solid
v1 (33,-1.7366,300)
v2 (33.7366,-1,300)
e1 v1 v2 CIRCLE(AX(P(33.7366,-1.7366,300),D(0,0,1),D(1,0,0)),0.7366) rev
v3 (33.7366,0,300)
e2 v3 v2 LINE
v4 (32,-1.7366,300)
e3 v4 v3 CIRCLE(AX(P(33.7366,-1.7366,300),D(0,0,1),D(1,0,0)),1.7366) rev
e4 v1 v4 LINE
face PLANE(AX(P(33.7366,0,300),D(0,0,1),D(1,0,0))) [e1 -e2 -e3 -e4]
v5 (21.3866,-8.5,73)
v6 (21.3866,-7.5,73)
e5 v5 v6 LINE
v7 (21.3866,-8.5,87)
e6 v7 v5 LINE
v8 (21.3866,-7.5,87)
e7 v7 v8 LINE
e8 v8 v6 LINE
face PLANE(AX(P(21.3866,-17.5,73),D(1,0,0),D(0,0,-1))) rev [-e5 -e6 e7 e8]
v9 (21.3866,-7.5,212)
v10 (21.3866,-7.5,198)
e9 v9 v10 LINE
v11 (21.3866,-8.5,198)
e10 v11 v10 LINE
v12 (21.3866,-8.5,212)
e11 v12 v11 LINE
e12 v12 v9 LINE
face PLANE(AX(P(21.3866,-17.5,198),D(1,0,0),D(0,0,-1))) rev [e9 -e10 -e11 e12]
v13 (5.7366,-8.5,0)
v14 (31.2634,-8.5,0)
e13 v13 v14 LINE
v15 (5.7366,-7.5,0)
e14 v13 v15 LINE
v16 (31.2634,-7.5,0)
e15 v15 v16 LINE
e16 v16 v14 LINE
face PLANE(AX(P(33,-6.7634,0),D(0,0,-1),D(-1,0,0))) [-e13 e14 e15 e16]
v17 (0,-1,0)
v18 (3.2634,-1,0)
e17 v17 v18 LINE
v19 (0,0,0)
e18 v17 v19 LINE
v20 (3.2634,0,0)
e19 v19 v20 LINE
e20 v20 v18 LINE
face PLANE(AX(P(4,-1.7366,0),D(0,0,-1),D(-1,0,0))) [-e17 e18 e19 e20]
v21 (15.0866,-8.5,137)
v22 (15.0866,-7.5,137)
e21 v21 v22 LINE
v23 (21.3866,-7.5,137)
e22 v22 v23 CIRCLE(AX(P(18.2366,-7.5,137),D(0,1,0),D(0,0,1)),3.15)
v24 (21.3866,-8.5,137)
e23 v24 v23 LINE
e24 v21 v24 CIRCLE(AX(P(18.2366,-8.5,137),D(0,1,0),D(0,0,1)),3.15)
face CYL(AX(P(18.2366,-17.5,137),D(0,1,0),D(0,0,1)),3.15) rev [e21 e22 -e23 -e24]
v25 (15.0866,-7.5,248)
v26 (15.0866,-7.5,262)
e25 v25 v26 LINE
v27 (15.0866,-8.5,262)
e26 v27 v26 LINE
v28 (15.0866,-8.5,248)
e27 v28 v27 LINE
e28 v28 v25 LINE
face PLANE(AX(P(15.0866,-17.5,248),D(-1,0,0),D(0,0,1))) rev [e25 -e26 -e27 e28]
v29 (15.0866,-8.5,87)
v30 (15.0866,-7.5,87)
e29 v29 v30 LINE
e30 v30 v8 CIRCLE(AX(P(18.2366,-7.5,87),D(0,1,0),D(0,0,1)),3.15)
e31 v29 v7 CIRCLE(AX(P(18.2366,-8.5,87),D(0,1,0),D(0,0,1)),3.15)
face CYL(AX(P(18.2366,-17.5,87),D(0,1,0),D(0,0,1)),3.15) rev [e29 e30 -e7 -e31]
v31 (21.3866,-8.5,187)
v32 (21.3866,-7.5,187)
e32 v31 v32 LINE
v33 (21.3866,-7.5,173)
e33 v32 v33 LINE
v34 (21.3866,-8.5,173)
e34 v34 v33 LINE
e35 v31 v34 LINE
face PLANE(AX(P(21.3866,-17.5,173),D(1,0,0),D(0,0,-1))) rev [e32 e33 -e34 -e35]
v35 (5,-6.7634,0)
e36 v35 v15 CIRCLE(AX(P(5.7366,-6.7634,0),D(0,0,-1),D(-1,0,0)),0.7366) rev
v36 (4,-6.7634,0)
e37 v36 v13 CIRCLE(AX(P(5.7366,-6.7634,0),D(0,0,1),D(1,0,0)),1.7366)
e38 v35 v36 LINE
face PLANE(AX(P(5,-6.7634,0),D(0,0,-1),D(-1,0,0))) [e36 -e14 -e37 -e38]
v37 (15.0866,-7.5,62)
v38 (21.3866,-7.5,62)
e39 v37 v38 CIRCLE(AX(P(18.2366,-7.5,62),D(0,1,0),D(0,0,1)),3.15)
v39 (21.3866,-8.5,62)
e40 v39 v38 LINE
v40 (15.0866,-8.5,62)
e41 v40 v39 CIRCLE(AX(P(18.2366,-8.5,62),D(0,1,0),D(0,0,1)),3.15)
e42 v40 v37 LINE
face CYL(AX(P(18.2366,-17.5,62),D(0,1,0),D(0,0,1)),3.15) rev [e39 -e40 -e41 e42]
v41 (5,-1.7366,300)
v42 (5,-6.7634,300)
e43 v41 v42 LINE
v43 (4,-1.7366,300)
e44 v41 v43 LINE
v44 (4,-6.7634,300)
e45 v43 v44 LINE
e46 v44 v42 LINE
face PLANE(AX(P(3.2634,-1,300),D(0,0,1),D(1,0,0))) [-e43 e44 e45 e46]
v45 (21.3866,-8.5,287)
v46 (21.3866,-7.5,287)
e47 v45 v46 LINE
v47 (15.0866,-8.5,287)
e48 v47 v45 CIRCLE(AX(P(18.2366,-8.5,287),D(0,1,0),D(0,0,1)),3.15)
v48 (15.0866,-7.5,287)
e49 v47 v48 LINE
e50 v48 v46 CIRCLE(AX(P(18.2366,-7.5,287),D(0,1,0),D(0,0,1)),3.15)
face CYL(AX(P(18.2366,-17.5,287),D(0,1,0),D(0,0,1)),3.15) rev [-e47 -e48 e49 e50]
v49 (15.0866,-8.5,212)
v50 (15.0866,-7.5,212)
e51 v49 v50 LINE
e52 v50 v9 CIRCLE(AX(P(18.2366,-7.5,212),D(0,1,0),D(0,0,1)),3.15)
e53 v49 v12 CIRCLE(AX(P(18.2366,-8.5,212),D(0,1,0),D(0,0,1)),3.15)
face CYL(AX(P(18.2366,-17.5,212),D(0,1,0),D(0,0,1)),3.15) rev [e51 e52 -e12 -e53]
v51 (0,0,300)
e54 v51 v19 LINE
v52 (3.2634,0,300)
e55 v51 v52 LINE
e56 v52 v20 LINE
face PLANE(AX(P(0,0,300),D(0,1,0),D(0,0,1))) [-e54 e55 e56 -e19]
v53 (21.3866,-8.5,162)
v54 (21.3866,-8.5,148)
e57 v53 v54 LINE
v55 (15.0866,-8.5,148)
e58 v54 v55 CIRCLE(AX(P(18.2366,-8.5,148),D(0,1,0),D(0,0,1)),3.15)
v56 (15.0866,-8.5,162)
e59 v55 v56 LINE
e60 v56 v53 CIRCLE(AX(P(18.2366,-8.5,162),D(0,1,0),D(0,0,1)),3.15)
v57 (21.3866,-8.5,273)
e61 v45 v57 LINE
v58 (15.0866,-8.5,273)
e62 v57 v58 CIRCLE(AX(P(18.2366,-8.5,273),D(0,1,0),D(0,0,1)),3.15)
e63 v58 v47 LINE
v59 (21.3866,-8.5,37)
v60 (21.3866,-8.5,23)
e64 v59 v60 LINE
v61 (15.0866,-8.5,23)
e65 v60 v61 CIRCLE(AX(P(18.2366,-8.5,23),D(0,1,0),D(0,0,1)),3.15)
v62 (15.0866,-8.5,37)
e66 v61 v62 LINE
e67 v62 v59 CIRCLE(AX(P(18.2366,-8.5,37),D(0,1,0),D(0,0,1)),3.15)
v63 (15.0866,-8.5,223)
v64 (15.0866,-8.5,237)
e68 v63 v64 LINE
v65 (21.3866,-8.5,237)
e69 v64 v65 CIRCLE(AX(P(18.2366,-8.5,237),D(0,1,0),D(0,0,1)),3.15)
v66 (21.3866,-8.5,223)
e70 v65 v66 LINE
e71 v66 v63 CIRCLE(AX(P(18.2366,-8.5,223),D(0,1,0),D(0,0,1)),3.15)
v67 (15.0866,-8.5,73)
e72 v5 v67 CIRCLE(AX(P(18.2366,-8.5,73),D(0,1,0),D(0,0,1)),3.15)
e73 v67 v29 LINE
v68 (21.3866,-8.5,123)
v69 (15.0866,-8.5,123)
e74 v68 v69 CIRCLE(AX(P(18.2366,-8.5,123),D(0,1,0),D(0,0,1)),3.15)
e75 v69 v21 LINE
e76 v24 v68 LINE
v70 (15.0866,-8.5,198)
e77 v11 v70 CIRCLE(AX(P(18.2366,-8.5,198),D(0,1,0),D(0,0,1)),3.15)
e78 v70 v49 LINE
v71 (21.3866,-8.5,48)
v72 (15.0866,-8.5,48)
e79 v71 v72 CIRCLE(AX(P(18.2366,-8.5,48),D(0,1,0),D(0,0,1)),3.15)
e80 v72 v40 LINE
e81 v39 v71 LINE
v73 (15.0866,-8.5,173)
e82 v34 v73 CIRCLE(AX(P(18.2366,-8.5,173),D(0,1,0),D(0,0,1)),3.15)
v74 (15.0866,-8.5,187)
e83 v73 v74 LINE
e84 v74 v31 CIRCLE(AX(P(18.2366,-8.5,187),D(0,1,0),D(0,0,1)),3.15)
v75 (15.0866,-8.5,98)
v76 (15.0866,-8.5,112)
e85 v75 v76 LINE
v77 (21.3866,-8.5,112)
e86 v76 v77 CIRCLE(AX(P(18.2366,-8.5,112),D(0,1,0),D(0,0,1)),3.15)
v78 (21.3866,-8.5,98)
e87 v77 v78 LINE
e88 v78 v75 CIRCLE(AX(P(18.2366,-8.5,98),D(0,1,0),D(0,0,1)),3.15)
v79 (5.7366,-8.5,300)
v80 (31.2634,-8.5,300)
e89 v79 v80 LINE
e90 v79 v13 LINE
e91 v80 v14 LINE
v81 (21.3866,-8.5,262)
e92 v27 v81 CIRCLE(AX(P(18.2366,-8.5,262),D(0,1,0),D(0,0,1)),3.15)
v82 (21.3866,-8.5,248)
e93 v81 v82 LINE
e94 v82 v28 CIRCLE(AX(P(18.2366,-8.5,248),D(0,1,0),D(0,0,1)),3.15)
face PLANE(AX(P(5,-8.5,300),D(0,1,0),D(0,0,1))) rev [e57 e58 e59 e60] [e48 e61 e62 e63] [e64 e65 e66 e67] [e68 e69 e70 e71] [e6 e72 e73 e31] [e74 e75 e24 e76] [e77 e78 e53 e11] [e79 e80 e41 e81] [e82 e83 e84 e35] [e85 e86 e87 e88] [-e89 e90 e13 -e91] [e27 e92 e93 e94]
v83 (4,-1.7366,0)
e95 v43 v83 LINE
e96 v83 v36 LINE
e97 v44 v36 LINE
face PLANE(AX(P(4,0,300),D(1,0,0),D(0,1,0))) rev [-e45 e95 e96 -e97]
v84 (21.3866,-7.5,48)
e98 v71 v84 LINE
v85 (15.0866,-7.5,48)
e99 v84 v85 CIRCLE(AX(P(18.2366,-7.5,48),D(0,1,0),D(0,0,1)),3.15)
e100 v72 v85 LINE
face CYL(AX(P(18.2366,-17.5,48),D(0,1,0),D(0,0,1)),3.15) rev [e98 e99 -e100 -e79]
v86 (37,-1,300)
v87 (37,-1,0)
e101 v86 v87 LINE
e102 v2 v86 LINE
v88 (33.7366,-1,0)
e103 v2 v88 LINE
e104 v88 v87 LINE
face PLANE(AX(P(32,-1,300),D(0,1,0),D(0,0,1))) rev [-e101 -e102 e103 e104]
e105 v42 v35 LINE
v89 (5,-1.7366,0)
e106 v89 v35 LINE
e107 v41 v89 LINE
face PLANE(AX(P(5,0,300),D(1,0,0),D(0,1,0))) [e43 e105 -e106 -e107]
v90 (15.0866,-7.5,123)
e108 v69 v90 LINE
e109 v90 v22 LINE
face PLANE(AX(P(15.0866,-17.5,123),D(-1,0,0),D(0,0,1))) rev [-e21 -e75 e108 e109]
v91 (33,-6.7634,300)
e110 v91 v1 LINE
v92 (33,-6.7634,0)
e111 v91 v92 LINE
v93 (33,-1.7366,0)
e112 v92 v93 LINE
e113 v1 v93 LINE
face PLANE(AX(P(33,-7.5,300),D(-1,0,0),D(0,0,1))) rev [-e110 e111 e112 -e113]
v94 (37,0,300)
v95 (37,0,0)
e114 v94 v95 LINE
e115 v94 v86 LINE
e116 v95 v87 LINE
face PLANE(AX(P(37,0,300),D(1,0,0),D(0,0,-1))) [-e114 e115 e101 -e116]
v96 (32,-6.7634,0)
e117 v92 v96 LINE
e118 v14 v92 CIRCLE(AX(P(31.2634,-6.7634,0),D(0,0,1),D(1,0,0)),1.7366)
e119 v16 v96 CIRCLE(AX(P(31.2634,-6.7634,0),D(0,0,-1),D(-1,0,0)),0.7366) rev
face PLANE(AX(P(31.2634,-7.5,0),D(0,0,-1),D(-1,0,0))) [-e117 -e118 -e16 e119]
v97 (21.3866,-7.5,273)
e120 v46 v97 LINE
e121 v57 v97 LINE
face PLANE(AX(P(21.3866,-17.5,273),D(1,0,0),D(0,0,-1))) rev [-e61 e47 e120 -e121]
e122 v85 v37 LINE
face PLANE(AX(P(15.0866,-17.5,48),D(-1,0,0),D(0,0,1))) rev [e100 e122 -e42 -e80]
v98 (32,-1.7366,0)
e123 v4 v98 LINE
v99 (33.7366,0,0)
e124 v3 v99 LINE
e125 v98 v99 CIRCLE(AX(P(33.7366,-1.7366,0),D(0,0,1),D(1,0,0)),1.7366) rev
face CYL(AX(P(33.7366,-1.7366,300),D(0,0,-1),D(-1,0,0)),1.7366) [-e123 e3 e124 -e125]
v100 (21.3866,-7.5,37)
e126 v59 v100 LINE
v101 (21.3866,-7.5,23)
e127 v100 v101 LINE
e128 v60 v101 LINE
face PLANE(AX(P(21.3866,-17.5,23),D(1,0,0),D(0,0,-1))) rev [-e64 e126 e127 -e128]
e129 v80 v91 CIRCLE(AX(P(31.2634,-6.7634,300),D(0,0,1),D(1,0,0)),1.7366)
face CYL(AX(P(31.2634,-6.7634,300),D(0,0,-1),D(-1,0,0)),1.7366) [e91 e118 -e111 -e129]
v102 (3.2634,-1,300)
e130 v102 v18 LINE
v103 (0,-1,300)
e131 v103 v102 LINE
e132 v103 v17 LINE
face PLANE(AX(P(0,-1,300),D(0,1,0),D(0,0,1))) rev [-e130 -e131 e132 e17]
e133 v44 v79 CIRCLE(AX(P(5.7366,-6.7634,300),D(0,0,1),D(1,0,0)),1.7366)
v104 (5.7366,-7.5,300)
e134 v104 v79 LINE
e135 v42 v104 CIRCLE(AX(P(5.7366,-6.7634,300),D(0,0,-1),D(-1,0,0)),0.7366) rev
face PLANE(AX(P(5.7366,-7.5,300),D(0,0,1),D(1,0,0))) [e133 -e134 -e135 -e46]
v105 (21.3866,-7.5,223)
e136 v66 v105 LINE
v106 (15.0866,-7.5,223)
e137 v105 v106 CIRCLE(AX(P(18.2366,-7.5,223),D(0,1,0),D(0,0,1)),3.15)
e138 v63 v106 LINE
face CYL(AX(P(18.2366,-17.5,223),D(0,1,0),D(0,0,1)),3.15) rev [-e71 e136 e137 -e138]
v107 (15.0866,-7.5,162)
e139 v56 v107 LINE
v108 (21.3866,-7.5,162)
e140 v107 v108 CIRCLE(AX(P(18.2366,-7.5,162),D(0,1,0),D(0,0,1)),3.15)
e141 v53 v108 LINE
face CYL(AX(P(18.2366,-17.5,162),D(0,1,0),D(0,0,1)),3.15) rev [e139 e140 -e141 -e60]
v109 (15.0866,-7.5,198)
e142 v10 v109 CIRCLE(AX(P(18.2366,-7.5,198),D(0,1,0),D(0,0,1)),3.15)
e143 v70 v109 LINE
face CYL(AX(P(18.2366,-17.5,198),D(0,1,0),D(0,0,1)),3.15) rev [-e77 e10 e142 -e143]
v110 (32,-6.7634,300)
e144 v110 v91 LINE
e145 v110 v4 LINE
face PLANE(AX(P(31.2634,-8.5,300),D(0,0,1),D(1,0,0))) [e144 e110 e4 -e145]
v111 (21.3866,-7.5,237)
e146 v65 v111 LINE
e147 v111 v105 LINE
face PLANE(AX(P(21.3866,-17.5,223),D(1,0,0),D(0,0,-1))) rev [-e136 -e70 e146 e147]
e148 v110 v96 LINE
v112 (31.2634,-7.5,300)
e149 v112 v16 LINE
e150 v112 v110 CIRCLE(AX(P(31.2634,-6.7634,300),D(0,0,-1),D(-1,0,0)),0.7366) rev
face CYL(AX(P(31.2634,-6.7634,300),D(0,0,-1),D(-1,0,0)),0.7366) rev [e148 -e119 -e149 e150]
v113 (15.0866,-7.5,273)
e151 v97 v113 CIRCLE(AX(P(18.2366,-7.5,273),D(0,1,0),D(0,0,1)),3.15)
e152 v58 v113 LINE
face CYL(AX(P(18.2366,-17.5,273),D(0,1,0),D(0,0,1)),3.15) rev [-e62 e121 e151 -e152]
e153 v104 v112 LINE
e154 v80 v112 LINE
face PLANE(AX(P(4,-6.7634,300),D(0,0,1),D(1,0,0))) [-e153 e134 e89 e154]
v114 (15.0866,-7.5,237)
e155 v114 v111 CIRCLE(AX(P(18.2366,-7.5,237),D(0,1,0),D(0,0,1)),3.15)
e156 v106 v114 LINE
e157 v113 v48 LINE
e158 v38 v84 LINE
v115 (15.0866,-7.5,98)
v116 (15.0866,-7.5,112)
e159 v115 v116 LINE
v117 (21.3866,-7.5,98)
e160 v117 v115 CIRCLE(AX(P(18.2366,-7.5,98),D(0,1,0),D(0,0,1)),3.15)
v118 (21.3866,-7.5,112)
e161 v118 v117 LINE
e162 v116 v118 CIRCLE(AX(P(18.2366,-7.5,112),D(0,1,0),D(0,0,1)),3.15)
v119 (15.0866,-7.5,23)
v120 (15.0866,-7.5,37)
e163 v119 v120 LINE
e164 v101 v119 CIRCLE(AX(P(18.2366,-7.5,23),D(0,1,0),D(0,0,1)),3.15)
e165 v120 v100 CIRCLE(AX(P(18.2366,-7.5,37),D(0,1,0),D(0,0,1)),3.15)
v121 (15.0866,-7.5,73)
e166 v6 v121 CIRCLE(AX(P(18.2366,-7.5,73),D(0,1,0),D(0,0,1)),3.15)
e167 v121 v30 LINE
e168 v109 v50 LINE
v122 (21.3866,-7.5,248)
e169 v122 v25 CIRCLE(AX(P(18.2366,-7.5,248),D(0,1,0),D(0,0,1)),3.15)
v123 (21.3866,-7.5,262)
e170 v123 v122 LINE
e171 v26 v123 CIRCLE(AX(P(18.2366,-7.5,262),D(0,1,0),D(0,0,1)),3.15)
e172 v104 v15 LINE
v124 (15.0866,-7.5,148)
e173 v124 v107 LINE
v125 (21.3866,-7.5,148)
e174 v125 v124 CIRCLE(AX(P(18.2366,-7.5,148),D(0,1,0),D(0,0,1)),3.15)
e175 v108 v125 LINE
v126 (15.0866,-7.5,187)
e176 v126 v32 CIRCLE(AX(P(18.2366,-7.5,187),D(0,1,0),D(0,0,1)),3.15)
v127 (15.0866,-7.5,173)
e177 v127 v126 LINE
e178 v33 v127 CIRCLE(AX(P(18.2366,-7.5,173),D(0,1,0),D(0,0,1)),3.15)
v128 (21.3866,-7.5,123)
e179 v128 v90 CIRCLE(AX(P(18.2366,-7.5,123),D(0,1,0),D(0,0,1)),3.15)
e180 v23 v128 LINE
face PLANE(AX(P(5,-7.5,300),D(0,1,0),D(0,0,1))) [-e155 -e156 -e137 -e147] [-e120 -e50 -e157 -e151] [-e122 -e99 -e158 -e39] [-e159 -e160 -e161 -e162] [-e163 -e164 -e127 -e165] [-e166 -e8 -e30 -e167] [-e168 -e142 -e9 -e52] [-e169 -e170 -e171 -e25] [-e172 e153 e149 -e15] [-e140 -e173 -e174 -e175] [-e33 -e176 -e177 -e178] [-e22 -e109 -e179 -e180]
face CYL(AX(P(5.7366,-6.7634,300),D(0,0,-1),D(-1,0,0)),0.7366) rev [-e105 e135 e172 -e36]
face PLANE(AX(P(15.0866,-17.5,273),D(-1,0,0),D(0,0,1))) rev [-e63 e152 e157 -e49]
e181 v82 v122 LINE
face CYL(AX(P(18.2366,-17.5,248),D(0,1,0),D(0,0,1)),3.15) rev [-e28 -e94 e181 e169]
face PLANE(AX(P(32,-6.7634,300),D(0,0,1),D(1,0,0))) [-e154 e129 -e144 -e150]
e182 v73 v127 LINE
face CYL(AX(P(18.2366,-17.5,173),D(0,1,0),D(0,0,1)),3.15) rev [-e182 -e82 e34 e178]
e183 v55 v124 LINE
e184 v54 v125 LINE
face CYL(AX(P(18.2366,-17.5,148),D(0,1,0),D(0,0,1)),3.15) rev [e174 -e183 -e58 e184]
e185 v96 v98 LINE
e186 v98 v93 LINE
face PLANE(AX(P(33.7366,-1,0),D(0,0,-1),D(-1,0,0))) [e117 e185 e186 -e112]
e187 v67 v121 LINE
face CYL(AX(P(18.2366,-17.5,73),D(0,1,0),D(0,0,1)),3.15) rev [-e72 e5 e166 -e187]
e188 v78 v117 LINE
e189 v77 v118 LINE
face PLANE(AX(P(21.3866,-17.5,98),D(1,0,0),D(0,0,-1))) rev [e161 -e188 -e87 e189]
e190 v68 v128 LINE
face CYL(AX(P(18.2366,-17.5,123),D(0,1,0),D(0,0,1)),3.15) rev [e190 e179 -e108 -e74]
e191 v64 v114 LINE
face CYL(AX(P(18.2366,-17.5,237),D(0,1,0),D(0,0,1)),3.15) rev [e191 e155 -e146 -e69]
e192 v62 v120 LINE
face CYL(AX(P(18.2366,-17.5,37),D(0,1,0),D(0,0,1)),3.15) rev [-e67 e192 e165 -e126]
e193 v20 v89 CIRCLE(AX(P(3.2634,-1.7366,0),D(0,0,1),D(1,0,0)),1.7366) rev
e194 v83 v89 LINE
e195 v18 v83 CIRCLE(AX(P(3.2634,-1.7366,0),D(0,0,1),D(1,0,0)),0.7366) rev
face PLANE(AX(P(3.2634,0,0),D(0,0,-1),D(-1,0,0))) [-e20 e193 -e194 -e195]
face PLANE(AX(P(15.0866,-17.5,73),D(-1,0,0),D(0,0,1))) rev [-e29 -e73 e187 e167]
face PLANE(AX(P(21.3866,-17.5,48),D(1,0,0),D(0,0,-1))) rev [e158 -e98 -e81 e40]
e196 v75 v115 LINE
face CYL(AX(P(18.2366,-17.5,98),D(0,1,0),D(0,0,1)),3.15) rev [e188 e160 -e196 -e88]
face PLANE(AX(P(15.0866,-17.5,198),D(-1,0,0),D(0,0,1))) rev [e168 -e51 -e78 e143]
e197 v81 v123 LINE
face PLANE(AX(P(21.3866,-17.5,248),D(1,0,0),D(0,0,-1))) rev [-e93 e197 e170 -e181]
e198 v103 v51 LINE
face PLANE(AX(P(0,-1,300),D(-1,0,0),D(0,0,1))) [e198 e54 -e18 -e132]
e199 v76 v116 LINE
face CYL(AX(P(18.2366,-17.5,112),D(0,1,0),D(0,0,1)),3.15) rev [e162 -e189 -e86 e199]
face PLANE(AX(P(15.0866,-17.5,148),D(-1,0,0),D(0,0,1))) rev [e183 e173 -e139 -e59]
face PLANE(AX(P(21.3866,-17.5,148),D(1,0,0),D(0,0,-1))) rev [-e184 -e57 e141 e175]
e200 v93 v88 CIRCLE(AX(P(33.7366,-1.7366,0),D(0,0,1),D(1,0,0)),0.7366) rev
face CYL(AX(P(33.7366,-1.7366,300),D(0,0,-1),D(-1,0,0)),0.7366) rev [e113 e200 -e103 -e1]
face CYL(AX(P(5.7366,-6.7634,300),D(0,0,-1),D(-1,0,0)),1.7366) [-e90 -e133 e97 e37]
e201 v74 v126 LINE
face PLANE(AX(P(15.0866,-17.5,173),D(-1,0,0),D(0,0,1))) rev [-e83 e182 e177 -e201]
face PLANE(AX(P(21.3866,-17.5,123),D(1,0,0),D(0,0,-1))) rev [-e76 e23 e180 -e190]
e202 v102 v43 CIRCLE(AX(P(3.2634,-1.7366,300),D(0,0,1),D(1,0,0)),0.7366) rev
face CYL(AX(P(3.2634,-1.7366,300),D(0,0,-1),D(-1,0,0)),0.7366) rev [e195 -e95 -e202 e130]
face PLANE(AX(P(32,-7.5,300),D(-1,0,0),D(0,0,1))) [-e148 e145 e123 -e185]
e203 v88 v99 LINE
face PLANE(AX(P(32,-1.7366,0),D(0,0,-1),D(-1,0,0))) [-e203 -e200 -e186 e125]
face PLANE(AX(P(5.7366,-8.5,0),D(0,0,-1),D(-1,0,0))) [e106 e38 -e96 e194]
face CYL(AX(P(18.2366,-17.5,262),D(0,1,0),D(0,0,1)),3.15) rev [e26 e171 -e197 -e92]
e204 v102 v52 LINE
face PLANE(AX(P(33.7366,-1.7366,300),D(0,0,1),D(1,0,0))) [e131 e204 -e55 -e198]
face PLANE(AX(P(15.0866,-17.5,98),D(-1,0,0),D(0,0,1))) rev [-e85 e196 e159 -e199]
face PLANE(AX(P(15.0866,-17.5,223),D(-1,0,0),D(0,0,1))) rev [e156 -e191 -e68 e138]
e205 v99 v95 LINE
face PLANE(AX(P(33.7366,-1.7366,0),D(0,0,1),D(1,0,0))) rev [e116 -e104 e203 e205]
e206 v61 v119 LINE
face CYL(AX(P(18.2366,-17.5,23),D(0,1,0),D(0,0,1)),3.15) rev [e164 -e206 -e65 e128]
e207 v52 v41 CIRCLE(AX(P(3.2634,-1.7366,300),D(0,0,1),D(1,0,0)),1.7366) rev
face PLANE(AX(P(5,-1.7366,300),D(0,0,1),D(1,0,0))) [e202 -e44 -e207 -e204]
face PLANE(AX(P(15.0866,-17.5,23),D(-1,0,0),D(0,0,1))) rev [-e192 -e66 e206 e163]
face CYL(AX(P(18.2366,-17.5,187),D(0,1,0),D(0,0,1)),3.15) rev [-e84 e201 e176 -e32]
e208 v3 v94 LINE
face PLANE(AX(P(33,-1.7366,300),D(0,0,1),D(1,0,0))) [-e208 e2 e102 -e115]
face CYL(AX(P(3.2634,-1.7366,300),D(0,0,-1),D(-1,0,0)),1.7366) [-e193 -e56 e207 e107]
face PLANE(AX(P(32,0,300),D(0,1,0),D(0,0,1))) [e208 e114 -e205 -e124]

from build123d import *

# Parameters (mm, degrees)
BASE_FLANGE1_DEPTH = 300
CUT_EXTRUDE1_DEPTH = 10
LPATTERN1_COUNT    = 11
LPATTERN1_PITCH    = 25


# Sheet-metal steps are written as plain solids
with BuildPart() as part:
    # Sketch1 → Base-Flange1 (new body)
    with BuildSketch(Plane.XY):
        with BuildLine():
            Line((0, 0), (3.2634, 0))
            ThreePointArc((3.2634, 0), (4.491361636, -0.508638364), (5, -1.7366))
            Line((5, -1.7366), (5, -6.7634))
            ThreePointArc((5, -6.7634), (5.215745145, -7.284254855), (5.7366, -7.5))
            Line((5.7366, -7.5), (31.2634, -7.5))
            ThreePointArc((31.2634, -7.5), (31.784254855, -7.284254855), (32, -6.7634))
            Line((32, -6.7634), (32, -1.7366))
            ThreePointArc((32, -1.7366), (32.508638364, -0.508638364), (33.7366, 0))
            Line((33.7366, 0), (37, 0))
            Line((37, 0), (37, -1))
            Line((37, -1), (33.7366, -1))
            ThreePointArc((33.7366, -1), (33.215745145, -1.215745145), (33, -1.7366))
            Line((33, -1.7366), (33, -6.7634))
            ThreePointArc((33, -6.7634), (32.491361636, -7.991361636), (31.2634, -8.5))
            Line((31.2634, -8.5), (5.7366, -8.5))
            ThreePointArc((5.7366, -8.5), (4.508638364, -7.991361636), (4, -6.7634))
            Line((4, -6.7634), (4, -1.7366))
            ThreePointArc((4, -1.7366), (3.784254855, -1.215745145), (3.2634, -1))
            Line((3.2634, -1), (0, -1))
            Line((0, -1), (0, 0))
        make_face()
    extrude(amount=BASE_FLANGE1_DEPTH)

    # Sketch6 → Cut-Extrude1 (cut)
    with BuildSketch(Plane(origin=(0, -7.5, 0), x_dir=(1, 0, 0), z_dir=(0, 1, 0))):
        with BuildLine():
            Line((21.3866, -273), (21.3866, -287))
            ThreePointArc((21.3866, -287), (18.2366, -290.15), (15.0866, -287))
            Line((15.0866, -287), (15.0866, -273))
            ThreePointArc((15.0866, -273), (18.2366, -269.85), (21.3866, -273))
        make_face()
    cut_extrude1 = extrude(amount=-CUT_EXTRUDE1_DEPTH, mode=Mode.SUBTRACT)

    # LPattern1: Cut-Extrude1 ×11
    with Locations(*[(0, 0, -i * LPATTERN1_PITCH) for i in range(1, LPATTERN1_COUNT)]):
        add(cut_extrude1, mode=Mode.SUBTRACT)


solid = part.part
